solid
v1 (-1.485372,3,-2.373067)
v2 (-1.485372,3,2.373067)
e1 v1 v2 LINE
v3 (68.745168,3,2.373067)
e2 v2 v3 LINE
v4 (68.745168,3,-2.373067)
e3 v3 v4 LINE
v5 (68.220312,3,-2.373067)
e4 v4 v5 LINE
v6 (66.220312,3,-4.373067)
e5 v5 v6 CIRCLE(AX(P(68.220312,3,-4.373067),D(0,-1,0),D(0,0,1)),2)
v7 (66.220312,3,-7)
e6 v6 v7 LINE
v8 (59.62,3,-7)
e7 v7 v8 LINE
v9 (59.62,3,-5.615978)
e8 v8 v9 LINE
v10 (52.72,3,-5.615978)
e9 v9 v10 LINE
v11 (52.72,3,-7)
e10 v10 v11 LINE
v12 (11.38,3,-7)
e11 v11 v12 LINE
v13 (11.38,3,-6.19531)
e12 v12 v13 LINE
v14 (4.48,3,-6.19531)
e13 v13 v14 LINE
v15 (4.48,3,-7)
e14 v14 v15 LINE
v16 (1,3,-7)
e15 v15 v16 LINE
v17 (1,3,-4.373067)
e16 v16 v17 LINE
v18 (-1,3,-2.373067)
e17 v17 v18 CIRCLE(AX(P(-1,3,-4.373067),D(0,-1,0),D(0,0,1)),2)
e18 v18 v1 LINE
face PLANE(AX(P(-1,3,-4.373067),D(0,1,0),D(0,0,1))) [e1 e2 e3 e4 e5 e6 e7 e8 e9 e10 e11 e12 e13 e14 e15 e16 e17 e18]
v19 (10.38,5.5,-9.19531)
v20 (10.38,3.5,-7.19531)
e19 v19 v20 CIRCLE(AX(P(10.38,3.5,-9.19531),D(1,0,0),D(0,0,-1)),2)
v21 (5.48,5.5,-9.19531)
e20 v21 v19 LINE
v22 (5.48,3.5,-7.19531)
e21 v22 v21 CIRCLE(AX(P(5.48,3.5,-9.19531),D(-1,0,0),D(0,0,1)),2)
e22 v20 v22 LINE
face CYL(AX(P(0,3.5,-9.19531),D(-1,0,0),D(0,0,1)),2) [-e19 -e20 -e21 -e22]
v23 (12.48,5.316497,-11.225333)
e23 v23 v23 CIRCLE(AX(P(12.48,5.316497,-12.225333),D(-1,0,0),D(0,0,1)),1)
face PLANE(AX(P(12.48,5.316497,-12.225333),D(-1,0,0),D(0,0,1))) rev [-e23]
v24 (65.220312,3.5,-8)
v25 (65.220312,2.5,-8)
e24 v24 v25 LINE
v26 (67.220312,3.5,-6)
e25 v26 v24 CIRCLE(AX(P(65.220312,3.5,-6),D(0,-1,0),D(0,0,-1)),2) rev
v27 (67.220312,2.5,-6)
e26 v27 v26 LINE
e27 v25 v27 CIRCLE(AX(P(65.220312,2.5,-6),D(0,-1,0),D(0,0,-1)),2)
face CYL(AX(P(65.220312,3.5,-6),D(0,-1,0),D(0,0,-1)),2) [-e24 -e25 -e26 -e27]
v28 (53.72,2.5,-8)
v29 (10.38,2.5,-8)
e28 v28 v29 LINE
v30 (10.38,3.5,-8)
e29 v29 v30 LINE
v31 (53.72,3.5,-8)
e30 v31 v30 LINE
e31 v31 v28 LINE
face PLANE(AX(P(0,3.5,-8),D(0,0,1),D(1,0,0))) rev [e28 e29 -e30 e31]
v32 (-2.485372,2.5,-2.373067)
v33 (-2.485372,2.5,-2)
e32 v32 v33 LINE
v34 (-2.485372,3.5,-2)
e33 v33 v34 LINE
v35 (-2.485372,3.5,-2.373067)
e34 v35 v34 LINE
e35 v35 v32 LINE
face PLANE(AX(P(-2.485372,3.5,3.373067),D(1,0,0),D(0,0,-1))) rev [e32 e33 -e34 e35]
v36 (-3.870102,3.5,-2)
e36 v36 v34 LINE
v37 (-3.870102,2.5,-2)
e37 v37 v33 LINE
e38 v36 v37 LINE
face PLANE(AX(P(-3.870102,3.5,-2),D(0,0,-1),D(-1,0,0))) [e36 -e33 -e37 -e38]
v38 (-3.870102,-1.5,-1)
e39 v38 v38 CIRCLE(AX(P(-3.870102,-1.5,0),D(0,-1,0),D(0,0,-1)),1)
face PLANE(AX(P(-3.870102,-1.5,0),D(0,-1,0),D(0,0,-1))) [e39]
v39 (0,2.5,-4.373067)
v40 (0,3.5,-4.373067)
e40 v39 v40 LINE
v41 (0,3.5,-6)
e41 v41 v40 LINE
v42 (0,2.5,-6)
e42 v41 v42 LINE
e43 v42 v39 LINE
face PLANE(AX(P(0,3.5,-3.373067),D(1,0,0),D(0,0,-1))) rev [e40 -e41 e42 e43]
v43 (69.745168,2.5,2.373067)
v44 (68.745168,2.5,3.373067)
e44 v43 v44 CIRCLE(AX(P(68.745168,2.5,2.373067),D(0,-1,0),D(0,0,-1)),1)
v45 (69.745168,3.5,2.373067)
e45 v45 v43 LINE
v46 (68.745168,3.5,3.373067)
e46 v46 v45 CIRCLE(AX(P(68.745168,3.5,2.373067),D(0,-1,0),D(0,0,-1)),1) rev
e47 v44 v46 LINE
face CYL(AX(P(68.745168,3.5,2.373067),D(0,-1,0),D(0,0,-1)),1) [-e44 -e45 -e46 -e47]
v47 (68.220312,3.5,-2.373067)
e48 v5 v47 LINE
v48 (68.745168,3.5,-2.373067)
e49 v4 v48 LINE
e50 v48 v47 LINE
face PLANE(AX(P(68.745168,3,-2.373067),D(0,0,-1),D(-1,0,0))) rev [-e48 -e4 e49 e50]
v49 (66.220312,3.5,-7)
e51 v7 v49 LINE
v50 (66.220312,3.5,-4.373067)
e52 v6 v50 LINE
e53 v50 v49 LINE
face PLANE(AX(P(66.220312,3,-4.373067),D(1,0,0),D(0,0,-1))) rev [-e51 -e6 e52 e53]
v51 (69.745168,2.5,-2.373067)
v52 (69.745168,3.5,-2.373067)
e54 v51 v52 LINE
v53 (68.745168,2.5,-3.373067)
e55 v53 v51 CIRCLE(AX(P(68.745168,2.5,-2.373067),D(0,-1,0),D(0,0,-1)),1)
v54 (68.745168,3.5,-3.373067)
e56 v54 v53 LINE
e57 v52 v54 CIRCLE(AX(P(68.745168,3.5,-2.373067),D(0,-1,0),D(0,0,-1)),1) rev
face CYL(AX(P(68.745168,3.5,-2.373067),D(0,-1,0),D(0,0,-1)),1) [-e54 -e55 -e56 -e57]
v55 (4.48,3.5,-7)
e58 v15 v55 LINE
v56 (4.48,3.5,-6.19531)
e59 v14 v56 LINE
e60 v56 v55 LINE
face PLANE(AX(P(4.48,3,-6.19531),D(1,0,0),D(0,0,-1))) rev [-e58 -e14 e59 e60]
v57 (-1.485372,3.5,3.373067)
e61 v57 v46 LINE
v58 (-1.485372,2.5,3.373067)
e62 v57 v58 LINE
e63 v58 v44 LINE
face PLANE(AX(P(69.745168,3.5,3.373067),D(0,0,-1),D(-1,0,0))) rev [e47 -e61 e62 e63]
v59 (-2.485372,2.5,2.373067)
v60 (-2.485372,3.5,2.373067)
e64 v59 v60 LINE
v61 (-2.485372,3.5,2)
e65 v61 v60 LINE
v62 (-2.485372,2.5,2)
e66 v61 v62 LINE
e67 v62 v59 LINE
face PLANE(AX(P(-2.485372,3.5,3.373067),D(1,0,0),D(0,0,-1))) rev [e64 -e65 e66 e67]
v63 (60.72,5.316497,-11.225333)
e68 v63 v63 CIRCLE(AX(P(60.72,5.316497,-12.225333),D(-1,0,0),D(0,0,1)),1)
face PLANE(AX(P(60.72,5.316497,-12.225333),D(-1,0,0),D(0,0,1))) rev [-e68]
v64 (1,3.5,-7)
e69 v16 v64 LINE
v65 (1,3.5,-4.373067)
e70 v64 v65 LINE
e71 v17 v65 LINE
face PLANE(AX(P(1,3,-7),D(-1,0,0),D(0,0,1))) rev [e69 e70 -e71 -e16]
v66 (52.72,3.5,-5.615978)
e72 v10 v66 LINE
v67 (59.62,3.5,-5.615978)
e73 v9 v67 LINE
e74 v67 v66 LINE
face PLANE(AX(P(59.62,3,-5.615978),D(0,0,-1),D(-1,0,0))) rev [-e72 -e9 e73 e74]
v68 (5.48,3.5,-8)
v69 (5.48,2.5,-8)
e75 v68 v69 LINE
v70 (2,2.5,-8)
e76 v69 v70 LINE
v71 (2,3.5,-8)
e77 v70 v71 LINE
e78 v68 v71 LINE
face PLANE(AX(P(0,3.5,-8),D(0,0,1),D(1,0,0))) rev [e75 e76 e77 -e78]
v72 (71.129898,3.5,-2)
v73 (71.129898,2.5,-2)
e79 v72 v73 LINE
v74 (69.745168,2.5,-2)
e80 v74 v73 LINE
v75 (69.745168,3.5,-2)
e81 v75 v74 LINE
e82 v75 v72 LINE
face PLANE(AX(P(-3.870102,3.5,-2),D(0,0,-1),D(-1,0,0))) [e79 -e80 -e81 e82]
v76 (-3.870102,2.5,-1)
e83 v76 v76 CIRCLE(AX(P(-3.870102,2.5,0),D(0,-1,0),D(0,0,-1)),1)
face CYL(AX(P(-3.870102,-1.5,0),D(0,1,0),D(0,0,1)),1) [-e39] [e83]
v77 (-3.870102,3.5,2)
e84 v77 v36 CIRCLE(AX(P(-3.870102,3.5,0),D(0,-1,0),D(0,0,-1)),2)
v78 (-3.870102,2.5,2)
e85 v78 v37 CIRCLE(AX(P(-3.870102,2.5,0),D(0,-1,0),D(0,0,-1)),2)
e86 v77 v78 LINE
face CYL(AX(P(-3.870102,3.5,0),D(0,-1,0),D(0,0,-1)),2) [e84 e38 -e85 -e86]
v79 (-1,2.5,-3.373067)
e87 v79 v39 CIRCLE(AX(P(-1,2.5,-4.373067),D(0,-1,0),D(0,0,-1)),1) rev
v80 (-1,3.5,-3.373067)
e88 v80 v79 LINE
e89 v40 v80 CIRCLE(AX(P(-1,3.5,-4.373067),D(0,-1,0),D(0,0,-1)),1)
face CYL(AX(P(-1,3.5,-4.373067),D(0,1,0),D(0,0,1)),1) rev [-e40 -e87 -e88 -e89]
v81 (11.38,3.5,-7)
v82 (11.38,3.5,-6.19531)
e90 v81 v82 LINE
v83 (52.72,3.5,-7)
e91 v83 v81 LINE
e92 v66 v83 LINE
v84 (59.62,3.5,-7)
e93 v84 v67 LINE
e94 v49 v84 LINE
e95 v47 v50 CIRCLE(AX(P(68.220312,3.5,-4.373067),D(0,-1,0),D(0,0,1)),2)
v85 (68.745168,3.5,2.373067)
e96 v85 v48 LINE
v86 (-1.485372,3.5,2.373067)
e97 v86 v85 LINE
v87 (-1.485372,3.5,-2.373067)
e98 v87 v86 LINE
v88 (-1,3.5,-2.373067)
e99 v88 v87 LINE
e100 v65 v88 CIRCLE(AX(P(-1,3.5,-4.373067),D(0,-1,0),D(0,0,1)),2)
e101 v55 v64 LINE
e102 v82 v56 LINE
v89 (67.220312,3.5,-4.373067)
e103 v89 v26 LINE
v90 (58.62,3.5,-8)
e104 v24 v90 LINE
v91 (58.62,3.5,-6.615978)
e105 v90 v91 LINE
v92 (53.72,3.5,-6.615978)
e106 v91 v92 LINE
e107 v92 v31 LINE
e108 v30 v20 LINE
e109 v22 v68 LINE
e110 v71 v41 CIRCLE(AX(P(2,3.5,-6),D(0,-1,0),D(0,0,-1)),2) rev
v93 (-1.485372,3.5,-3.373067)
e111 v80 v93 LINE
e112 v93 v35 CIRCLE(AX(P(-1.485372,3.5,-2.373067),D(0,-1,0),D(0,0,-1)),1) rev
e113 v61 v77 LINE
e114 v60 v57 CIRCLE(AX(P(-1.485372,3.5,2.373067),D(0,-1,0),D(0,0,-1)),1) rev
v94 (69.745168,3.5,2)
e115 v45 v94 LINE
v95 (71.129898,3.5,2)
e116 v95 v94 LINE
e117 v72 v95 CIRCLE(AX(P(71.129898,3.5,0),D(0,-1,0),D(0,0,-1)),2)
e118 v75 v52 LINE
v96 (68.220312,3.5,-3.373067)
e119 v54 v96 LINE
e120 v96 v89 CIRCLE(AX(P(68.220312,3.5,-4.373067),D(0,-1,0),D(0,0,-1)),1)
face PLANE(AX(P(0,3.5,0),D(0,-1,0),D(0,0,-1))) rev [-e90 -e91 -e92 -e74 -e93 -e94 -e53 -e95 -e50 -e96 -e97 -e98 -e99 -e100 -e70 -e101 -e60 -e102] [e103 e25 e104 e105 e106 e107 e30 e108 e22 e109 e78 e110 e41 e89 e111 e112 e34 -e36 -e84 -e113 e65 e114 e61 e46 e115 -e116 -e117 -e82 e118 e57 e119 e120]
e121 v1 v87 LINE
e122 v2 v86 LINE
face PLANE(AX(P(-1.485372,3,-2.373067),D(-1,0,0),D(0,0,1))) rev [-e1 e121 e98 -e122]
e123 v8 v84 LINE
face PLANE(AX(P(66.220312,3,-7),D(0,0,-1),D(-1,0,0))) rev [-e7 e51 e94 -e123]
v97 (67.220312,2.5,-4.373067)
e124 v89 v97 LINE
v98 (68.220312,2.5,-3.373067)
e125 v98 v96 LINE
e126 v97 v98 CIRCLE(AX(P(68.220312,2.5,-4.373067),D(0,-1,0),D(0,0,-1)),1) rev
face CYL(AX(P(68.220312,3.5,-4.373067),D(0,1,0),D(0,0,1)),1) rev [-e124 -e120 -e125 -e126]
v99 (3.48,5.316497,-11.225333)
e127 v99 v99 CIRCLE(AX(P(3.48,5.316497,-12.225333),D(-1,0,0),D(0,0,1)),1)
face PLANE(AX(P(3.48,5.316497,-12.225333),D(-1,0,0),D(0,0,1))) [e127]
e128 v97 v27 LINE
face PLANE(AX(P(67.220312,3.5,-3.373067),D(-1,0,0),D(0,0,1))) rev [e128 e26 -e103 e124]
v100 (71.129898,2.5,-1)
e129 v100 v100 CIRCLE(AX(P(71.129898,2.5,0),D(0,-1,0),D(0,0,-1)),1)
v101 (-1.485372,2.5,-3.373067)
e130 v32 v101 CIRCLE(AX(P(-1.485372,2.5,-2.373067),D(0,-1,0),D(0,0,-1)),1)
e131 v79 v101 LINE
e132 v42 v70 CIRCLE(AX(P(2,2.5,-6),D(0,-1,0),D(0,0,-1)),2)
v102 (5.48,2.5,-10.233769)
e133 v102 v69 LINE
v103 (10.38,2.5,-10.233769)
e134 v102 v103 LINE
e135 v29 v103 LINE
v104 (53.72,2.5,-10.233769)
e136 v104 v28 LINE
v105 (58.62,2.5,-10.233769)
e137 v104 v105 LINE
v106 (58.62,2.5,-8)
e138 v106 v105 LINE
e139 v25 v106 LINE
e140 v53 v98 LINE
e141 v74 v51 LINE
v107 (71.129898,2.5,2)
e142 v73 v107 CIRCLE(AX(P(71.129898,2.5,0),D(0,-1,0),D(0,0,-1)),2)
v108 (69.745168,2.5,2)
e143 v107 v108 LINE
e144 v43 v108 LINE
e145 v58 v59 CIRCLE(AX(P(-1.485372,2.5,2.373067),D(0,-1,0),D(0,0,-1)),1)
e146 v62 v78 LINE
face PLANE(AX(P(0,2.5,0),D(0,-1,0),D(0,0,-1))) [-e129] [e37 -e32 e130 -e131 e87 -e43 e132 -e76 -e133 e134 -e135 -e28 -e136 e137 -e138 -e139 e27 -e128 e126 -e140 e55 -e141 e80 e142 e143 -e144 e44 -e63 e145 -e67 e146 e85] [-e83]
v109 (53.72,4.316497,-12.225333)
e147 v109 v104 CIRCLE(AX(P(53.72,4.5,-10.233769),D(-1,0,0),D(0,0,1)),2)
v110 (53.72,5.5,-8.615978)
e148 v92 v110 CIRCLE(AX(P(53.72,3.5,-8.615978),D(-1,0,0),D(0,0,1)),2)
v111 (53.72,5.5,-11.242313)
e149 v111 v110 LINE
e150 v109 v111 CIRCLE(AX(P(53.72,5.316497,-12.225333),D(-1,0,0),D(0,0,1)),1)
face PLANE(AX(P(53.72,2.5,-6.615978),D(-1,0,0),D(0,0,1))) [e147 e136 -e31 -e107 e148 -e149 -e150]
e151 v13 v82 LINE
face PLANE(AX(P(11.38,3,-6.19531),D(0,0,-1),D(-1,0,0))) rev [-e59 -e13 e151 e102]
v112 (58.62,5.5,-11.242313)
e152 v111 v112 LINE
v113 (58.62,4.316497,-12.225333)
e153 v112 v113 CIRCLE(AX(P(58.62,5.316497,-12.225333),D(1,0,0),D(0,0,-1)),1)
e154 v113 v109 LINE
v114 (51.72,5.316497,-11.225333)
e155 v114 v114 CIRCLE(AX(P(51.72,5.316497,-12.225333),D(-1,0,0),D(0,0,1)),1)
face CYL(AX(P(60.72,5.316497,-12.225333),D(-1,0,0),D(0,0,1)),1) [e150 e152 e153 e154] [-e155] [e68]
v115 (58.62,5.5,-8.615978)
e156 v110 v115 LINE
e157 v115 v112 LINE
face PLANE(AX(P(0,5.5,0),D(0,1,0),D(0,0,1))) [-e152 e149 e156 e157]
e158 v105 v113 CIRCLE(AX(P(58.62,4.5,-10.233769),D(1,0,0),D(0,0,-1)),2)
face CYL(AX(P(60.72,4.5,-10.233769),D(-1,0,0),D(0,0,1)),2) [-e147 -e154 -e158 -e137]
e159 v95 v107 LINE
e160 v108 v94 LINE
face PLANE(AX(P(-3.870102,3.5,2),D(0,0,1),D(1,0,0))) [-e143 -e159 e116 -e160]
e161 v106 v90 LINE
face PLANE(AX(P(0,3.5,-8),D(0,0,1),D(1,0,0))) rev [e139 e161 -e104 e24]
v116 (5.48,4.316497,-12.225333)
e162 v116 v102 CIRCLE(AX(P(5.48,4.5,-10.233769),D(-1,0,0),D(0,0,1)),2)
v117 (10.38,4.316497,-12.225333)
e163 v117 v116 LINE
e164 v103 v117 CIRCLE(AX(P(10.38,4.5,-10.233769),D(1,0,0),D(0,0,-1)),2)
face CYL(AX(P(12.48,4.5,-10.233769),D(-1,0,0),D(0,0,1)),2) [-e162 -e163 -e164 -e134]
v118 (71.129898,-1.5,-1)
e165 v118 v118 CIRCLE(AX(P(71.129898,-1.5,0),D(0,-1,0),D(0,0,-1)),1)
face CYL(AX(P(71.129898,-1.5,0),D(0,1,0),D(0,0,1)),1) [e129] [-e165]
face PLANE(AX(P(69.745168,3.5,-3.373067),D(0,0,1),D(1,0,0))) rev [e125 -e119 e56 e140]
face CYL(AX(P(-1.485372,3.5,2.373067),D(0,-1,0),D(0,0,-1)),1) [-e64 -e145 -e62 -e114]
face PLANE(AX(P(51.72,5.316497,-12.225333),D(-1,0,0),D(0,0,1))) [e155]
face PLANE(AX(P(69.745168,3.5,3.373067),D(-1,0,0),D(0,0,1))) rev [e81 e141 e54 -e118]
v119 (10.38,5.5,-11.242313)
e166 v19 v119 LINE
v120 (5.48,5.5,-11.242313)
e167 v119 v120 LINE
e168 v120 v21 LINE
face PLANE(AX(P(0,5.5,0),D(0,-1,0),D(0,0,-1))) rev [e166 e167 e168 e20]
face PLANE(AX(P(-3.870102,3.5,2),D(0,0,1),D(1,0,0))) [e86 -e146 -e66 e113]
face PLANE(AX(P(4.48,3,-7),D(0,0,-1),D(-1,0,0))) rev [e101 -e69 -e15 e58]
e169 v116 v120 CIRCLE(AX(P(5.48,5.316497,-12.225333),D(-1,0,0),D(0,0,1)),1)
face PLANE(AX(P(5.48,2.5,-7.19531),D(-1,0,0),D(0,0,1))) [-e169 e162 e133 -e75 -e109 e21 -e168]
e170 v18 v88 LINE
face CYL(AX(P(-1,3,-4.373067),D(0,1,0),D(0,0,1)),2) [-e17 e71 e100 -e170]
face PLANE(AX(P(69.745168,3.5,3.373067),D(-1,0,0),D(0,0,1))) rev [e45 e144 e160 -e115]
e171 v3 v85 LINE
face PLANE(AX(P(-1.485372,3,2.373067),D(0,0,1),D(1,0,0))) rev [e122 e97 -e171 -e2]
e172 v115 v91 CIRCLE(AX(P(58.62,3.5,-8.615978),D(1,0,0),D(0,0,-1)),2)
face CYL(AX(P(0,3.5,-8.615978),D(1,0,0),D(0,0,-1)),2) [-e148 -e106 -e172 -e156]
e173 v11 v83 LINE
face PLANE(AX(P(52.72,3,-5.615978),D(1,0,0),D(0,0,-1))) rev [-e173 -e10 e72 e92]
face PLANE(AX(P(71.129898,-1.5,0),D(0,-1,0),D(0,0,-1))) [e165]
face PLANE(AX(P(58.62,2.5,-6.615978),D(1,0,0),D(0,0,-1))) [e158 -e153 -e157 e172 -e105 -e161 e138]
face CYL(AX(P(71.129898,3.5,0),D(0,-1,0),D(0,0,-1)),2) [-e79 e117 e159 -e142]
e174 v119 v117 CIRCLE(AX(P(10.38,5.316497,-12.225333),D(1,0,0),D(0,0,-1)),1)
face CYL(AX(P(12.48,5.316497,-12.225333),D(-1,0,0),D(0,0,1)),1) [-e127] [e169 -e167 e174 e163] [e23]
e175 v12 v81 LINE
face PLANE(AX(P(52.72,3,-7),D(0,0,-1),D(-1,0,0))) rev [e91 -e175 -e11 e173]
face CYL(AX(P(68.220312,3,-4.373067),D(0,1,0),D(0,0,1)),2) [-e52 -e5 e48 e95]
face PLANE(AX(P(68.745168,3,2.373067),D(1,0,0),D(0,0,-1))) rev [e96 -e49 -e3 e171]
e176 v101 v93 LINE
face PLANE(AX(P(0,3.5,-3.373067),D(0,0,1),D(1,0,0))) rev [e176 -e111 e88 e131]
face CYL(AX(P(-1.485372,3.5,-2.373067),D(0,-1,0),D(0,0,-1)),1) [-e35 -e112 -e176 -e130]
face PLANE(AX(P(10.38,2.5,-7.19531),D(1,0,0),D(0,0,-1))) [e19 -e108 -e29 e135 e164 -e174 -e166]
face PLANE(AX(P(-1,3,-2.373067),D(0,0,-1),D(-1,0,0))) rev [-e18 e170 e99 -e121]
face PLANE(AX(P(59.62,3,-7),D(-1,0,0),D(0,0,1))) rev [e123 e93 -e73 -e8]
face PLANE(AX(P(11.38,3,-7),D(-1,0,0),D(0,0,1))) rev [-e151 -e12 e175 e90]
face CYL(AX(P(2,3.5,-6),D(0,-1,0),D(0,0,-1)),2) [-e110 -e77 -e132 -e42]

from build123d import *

# Parameters (mm, degrees)
SKETCH1_R                = 2
BOSS_EXTRUDE1_DEPTH      = 2.5
BOSS_EXTRUDE1_2_DEPTH    = 2.5
BOSS_EXTRUDE3_DEPTH      = 1
FILLET1_R                = 1
BOSS_EXTRUDE4_DEPTH      = 2
BOSS_EXTRUDE4_DEPTH_BACK = 1
SKETCH3_W                = 4.9
SKETCH3_H                = 5.030022666
SKETCH3_H_2              = 5.609354891
BOSS_EXTRUDE5_DEPTH      = 2
BOSS_EXTRUDE5_DEPTH_BACK = 7
SKETCH4_R                = 1
BOSS_EXTRUDE6_DEPTH      = 2
BOSS_EXTRUDE6_DEPTH_BACK = 7
SKETCH5_R                = 1
FILLET2_R                = 2
FILLET3_R                = 2
CUT_EXTRUDE1_DEPTH       = 0.5
FILLET4_R                = 2
FILLET6_R                = 2
SKETCH7_W                = 77.047719234
SKETCH7_H                = 13.468868212
CUT_EXTRUDE2_DEPTH       = 10
SKETCH8_R                = 1
BOSS_EXTRUDE7_DEPTH      = 4
BOSS_EXTRUDE7_2_DEPTH    = 4
BOSS_EXTRUDE8_DEPTH      = 1
SKETCH10_W               = 70.230539596
SKETCH10_H               = 4.186533739
CUT_EXTRUDE4_DEPTH       = 1


# Some blends are built 0.0001 mm under size
with BuildPart() as part:
    # Sketch1 → Boss-Extrude1 (new body)
    with BuildSketch(Plane(origin=(0, 0, 0), x_dir=(1, 0, 0), z_dir=(0, 1, 0))):
        with Locations(Location((67.22, 0, 0), (0, 0, 270))):
            Circle(SKETCH1_R)
    extrude(amount=BOSS_EXTRUDE1_DEPTH)



with BuildPart() as body_2:
    # Sketch1 → Boss-Extrude1 2 (new body)
    with BuildSketch(Plane(origin=(0, 0, 0), x_dir=(1, 0, 0), z_dir=(0, 1, 0))):
        with Locations(Location((0, 0, 0), (0, 0, 270))):
            Circle(SKETCH1_R)
    extrude(amount=BOSS_EXTRUDE1_2_DEPTH)


with BuildPart() as part_1:
    add(part.part)

    add(body_2.part)  # Boss-Extrude3 merges body 2
    # Sketch2 → Boss-Extrude3 (add)
    with BuildSketch(Plane(origin=(0, 2.5, 0), x_dir=(1, 0, 0), z_dir=(0, 1, 0))):
        Polygon((0, 3.373067478), (0, 8), (67.22031246, 8), (67.22031246, 3.373067478), (69.745167769, 3.373067478), (69.745167769, -3.373067478), (-2.485371827, -3.373067478), (-2.485371827, 3.373067478), align=None)
    extrude(amount=BOSS_EXTRUDE3_DEPTH)

    # Fillet1
    fillet1_edges = [part_1.edges().sort_by_distance(p)[0] for p in [
        (67.22031246, 3, -3.373067478),
        (0, 3, -3.373067478),
        (-2.485371827, 3, -3.373067478),
        (-2.485371827, 3, 3.373067478),
        (69.745167769, 3, 3.373067478),
        (69.745167769, 3, -3.373067478),
    ]]
    fillet(fillet1_edges, radius=FILLET1_R)

    # Sketch3 → Boss-Extrude4 (add, two sides: drawn at the far end of the back side and taken through both)
    with BuildSketch(Plane(origin=(0, 3.5, 0), x_dir=(1, 0, 0), z_dir=(0, 1, 0)).offset(-BOSS_EXTRUDE4_DEPTH_BACK)):
        with Locations((7.93, 9.710321272)):
            Rectangle(SKETCH3_W, SKETCH3_H)
        with Locations((56.17, 9.42065516)):
            Rectangle(SKETCH3_W, SKETCH3_H_2)
    extrude(amount=BOSS_EXTRUDE4_DEPTH + BOSS_EXTRUDE4_DEPTH_BACK)

    # Sketch4 → Boss-Extrude5 (add, two sides: drawn at the far end of the back side and taken through both)
    with BuildSketch(Plane.ZY.offset(-5.48).offset(-BOSS_EXTRUDE5_DEPTH_BACK)):
        with Locations((-12.225332605, 5.316497078)):
            Circle(SKETCH4_R)
    extrude(amount=BOSS_EXTRUDE5_DEPTH + BOSS_EXTRUDE5_DEPTH_BACK)

    # Sketch5 → Boss-Extrude6 (add, two sides: drawn at the far end of the back side and taken through both)
    with BuildSketch(Plane.ZY.offset(-53.72).offset(-BOSS_EXTRUDE6_DEPTH_BACK)):
        with Locations((-12.225332605, 5.316497078)):
            Circle(SKETCH5_R)
    extrude(amount=BOSS_EXTRUDE6_DEPTH + BOSS_EXTRUDE6_DEPTH_BACK)

    # Fillet2
    fillet2_edges = [part_1.edges().sort_by_distance(p)[0] for p in [
        (7.93, 5.5, -7.195309939),
        (56.17, 5.5, -6.615977714),
    ]]
    fillet(fillet2_edges, radius=FILLET2_R - 0.0001)  # a hair under: the kernel refuses the full size

    # Fillet3
    # the kernel refuses this fillet: 2 mm, written as the material it takes off along each edge
    with BuildSketch(Plane(origin=(48.741090307, 2.5, -12.225332605), x_dir=(0, 0, 1), z_dir=(1, 0, 0))) as fillet3_piece_1:
        with BuildLine():
            CenterArc((1.991563877, -2), FILLET3_R, 90, 84.735624625)
            Line((0, -1.816497078), (-0.039831278, -1.81282702))
            ThreePointArc((-0.039831278, -1.81282702), (-0.04, -0.908248539), (-0.04, 0))
            Line((-0.04, 0), (0, 0.04))
            Line((0, 0.04), (1.991563877, 0.04))
            Line((1.991563877, 0.04), (1.991563877, 0))
        make_face()
    extrude(amount=14.857819387, mode=Mode.SUBTRACT)

    # Sketch6 → Cut-Extrude1 (cut)
    with BuildSketch(Plane(origin=(0, 3.5, 0), x_dir=(1, 0, 0), z_dir=(0, 1, 0))):
        with BuildLine():
            Line((59.62, 5.615977714), (52.72, 5.615977714))
            Line((52.72, 5.615977714), (52.72, 7))
            Line((52.72, 7), (11.38, 7))
            Line((11.38, 7), (11.38, 6.195309939))
            Line((11.38, 6.195309939), (4.48, 6.195309939))
            Line((4.48, 6.195309939), (4.48, 7))
            Line((4.48, 7), (1, 7))
            Line((1, 7), (1, 4.373067478))
            ThreePointArc((1, 4.373067478), (0.414213562, 2.958853916), (-1, 2.373067478))
            Line((-1, 2.373067478), (-1.485371827, 2.373067478))
            Line((-1.485371827, 2.373067478), (-1.485371827, -2.373067478))
            Line((-1.485371827, -2.373067478), (68.745167769, -2.373067478))
            Line((68.745167769, -2.373067478), (68.745167769, 2.373067478))
            Line((68.745167769, 2.373067478), (68.22031246, 2.373067478))
            ThreePointArc((68.22031246, 2.373067478), (66.806098898, 2.958853916), (66.22031246, 4.373067478))
            Line((66.22031246, 4.373067478), (66.22031246, 7))
            Line((66.22031246, 7), (59.62, 7))
            Line((59.62, 7), (59.62, 5.615977714))
        make_face()
    extrude(amount=-CUT_EXTRUDE1_DEPTH, mode=Mode.SUBTRACT)

    # Fillet4
    # the kernel refuses this fillet: 2 mm, written as the material it takes off along each edge
    with BuildSketch(Plane(origin=(15.358909693, 2.5, -12.225332605), x_dir=(0, 0, 1), z_dir=(-1, 0, 0))) as fillet4_piece_1:
        with BuildLine():
            CenterArc((1.991563877, 2), FILLET4_R, 185.264375375, 84.735624625)
            Line((0, 1.816497078), (-0.039831278, 1.81282702))
            ThreePointArc((-0.039831278, 1.81282702), (-0.04, 0.908248539), (-0.04, 0))
            Line((-0.04, 0), (0, -0.04))
            Line((0, -0.04), (1.991563877, -0.04))
            Line((1.991563877, -0.04), (1.991563877, 0))
        make_face()
    extrude(amount=14.857819387, mode=Mode.SUBTRACT)

    # Fillet6
    fillet6_edges = [part_1.edges().sort_by_distance(p)[0] for p in [
        (67.22031246, 3, -8),
        (0, 3, -8),
    ]]
    fillet(fillet6_edges, radius=FILLET6_R)

    # Sketch7 → Cut-Extrude2 (cut)
    with BuildSketch(Plane.XZ.offset(-2.5)):
        with Locations((32.181632572, 2.423814337)):
            Rectangle(SKETCH7_W, SKETCH7_H)
    extrude(amount=CUT_EXTRUDE2_DEPTH, mode=Mode.SUBTRACT)



with BuildPart() as body_2_2:
    # Sketch8 → Boss-Extrude7 (new body)
    with BuildSketch(Plane(origin=(0, 2.5, 0), x_dir=(-1, 0, 0), z_dir=(0, -1, 0))):
        with Locations(Location((3.870102029, 0, 0), (0, 0, 90))):
            Circle(SKETCH8_R)
    extrude(amount=BOSS_EXTRUDE7_DEPTH)


with BuildPart() as body_3:
    # Sketch8 → Boss-Extrude7 2 (new body)
    with BuildSketch(Plane(origin=(0, 2.5, 0), x_dir=(-1, 0, 0), z_dir=(0, -1, 0))):
        with Locations(Location((-71.129897971, 0, 0), (0, 0, 90))):
            Circle(SKETCH8_R)
    extrude(amount=BOSS_EXTRUDE7_2_DEPTH)


with BuildPart() as part_2:
    add(part_1.part)

    add(body_2_2.part)  # Boss-Extrude8 merges body 2 2

    add(body_3.part)  # Boss-Extrude8 merges body 3
    # Sketch9 → Boss-Extrude8 (add)
    with BuildSketch(Plane.XZ.offset(-2.5)):
        with BuildLine():
            Line((-3.870102029, 2), (71.129897971, 2))
            ThreePointArc((71.129897971, 2), (73.129897971, 0), (71.129897971, -2))
            Line((71.129897971, -2), (-3.870102029, -2))
            ThreePointArc((-3.870102029, -2), (-5.870102029, 0), (-3.870102029, 2))
        make_face()
    extrude(amount=-BOSS_EXTRUDE8_DEPTH)

    # Sketch10 → Cut-Extrude4 (cut)
    with BuildSketch(Plane(origin=(0, 3, 0), x_dir=(1, 0, 0), z_dir=(0, 1, 0))):
        with Locations((33.629897971, -0.09326687)):
            Rectangle(SKETCH10_W, SKETCH10_H)
    extrude(amount=CUT_EXTRUDE4_DEPTH, mode=Mode.SUBTRACT)


solid = part_2.part
